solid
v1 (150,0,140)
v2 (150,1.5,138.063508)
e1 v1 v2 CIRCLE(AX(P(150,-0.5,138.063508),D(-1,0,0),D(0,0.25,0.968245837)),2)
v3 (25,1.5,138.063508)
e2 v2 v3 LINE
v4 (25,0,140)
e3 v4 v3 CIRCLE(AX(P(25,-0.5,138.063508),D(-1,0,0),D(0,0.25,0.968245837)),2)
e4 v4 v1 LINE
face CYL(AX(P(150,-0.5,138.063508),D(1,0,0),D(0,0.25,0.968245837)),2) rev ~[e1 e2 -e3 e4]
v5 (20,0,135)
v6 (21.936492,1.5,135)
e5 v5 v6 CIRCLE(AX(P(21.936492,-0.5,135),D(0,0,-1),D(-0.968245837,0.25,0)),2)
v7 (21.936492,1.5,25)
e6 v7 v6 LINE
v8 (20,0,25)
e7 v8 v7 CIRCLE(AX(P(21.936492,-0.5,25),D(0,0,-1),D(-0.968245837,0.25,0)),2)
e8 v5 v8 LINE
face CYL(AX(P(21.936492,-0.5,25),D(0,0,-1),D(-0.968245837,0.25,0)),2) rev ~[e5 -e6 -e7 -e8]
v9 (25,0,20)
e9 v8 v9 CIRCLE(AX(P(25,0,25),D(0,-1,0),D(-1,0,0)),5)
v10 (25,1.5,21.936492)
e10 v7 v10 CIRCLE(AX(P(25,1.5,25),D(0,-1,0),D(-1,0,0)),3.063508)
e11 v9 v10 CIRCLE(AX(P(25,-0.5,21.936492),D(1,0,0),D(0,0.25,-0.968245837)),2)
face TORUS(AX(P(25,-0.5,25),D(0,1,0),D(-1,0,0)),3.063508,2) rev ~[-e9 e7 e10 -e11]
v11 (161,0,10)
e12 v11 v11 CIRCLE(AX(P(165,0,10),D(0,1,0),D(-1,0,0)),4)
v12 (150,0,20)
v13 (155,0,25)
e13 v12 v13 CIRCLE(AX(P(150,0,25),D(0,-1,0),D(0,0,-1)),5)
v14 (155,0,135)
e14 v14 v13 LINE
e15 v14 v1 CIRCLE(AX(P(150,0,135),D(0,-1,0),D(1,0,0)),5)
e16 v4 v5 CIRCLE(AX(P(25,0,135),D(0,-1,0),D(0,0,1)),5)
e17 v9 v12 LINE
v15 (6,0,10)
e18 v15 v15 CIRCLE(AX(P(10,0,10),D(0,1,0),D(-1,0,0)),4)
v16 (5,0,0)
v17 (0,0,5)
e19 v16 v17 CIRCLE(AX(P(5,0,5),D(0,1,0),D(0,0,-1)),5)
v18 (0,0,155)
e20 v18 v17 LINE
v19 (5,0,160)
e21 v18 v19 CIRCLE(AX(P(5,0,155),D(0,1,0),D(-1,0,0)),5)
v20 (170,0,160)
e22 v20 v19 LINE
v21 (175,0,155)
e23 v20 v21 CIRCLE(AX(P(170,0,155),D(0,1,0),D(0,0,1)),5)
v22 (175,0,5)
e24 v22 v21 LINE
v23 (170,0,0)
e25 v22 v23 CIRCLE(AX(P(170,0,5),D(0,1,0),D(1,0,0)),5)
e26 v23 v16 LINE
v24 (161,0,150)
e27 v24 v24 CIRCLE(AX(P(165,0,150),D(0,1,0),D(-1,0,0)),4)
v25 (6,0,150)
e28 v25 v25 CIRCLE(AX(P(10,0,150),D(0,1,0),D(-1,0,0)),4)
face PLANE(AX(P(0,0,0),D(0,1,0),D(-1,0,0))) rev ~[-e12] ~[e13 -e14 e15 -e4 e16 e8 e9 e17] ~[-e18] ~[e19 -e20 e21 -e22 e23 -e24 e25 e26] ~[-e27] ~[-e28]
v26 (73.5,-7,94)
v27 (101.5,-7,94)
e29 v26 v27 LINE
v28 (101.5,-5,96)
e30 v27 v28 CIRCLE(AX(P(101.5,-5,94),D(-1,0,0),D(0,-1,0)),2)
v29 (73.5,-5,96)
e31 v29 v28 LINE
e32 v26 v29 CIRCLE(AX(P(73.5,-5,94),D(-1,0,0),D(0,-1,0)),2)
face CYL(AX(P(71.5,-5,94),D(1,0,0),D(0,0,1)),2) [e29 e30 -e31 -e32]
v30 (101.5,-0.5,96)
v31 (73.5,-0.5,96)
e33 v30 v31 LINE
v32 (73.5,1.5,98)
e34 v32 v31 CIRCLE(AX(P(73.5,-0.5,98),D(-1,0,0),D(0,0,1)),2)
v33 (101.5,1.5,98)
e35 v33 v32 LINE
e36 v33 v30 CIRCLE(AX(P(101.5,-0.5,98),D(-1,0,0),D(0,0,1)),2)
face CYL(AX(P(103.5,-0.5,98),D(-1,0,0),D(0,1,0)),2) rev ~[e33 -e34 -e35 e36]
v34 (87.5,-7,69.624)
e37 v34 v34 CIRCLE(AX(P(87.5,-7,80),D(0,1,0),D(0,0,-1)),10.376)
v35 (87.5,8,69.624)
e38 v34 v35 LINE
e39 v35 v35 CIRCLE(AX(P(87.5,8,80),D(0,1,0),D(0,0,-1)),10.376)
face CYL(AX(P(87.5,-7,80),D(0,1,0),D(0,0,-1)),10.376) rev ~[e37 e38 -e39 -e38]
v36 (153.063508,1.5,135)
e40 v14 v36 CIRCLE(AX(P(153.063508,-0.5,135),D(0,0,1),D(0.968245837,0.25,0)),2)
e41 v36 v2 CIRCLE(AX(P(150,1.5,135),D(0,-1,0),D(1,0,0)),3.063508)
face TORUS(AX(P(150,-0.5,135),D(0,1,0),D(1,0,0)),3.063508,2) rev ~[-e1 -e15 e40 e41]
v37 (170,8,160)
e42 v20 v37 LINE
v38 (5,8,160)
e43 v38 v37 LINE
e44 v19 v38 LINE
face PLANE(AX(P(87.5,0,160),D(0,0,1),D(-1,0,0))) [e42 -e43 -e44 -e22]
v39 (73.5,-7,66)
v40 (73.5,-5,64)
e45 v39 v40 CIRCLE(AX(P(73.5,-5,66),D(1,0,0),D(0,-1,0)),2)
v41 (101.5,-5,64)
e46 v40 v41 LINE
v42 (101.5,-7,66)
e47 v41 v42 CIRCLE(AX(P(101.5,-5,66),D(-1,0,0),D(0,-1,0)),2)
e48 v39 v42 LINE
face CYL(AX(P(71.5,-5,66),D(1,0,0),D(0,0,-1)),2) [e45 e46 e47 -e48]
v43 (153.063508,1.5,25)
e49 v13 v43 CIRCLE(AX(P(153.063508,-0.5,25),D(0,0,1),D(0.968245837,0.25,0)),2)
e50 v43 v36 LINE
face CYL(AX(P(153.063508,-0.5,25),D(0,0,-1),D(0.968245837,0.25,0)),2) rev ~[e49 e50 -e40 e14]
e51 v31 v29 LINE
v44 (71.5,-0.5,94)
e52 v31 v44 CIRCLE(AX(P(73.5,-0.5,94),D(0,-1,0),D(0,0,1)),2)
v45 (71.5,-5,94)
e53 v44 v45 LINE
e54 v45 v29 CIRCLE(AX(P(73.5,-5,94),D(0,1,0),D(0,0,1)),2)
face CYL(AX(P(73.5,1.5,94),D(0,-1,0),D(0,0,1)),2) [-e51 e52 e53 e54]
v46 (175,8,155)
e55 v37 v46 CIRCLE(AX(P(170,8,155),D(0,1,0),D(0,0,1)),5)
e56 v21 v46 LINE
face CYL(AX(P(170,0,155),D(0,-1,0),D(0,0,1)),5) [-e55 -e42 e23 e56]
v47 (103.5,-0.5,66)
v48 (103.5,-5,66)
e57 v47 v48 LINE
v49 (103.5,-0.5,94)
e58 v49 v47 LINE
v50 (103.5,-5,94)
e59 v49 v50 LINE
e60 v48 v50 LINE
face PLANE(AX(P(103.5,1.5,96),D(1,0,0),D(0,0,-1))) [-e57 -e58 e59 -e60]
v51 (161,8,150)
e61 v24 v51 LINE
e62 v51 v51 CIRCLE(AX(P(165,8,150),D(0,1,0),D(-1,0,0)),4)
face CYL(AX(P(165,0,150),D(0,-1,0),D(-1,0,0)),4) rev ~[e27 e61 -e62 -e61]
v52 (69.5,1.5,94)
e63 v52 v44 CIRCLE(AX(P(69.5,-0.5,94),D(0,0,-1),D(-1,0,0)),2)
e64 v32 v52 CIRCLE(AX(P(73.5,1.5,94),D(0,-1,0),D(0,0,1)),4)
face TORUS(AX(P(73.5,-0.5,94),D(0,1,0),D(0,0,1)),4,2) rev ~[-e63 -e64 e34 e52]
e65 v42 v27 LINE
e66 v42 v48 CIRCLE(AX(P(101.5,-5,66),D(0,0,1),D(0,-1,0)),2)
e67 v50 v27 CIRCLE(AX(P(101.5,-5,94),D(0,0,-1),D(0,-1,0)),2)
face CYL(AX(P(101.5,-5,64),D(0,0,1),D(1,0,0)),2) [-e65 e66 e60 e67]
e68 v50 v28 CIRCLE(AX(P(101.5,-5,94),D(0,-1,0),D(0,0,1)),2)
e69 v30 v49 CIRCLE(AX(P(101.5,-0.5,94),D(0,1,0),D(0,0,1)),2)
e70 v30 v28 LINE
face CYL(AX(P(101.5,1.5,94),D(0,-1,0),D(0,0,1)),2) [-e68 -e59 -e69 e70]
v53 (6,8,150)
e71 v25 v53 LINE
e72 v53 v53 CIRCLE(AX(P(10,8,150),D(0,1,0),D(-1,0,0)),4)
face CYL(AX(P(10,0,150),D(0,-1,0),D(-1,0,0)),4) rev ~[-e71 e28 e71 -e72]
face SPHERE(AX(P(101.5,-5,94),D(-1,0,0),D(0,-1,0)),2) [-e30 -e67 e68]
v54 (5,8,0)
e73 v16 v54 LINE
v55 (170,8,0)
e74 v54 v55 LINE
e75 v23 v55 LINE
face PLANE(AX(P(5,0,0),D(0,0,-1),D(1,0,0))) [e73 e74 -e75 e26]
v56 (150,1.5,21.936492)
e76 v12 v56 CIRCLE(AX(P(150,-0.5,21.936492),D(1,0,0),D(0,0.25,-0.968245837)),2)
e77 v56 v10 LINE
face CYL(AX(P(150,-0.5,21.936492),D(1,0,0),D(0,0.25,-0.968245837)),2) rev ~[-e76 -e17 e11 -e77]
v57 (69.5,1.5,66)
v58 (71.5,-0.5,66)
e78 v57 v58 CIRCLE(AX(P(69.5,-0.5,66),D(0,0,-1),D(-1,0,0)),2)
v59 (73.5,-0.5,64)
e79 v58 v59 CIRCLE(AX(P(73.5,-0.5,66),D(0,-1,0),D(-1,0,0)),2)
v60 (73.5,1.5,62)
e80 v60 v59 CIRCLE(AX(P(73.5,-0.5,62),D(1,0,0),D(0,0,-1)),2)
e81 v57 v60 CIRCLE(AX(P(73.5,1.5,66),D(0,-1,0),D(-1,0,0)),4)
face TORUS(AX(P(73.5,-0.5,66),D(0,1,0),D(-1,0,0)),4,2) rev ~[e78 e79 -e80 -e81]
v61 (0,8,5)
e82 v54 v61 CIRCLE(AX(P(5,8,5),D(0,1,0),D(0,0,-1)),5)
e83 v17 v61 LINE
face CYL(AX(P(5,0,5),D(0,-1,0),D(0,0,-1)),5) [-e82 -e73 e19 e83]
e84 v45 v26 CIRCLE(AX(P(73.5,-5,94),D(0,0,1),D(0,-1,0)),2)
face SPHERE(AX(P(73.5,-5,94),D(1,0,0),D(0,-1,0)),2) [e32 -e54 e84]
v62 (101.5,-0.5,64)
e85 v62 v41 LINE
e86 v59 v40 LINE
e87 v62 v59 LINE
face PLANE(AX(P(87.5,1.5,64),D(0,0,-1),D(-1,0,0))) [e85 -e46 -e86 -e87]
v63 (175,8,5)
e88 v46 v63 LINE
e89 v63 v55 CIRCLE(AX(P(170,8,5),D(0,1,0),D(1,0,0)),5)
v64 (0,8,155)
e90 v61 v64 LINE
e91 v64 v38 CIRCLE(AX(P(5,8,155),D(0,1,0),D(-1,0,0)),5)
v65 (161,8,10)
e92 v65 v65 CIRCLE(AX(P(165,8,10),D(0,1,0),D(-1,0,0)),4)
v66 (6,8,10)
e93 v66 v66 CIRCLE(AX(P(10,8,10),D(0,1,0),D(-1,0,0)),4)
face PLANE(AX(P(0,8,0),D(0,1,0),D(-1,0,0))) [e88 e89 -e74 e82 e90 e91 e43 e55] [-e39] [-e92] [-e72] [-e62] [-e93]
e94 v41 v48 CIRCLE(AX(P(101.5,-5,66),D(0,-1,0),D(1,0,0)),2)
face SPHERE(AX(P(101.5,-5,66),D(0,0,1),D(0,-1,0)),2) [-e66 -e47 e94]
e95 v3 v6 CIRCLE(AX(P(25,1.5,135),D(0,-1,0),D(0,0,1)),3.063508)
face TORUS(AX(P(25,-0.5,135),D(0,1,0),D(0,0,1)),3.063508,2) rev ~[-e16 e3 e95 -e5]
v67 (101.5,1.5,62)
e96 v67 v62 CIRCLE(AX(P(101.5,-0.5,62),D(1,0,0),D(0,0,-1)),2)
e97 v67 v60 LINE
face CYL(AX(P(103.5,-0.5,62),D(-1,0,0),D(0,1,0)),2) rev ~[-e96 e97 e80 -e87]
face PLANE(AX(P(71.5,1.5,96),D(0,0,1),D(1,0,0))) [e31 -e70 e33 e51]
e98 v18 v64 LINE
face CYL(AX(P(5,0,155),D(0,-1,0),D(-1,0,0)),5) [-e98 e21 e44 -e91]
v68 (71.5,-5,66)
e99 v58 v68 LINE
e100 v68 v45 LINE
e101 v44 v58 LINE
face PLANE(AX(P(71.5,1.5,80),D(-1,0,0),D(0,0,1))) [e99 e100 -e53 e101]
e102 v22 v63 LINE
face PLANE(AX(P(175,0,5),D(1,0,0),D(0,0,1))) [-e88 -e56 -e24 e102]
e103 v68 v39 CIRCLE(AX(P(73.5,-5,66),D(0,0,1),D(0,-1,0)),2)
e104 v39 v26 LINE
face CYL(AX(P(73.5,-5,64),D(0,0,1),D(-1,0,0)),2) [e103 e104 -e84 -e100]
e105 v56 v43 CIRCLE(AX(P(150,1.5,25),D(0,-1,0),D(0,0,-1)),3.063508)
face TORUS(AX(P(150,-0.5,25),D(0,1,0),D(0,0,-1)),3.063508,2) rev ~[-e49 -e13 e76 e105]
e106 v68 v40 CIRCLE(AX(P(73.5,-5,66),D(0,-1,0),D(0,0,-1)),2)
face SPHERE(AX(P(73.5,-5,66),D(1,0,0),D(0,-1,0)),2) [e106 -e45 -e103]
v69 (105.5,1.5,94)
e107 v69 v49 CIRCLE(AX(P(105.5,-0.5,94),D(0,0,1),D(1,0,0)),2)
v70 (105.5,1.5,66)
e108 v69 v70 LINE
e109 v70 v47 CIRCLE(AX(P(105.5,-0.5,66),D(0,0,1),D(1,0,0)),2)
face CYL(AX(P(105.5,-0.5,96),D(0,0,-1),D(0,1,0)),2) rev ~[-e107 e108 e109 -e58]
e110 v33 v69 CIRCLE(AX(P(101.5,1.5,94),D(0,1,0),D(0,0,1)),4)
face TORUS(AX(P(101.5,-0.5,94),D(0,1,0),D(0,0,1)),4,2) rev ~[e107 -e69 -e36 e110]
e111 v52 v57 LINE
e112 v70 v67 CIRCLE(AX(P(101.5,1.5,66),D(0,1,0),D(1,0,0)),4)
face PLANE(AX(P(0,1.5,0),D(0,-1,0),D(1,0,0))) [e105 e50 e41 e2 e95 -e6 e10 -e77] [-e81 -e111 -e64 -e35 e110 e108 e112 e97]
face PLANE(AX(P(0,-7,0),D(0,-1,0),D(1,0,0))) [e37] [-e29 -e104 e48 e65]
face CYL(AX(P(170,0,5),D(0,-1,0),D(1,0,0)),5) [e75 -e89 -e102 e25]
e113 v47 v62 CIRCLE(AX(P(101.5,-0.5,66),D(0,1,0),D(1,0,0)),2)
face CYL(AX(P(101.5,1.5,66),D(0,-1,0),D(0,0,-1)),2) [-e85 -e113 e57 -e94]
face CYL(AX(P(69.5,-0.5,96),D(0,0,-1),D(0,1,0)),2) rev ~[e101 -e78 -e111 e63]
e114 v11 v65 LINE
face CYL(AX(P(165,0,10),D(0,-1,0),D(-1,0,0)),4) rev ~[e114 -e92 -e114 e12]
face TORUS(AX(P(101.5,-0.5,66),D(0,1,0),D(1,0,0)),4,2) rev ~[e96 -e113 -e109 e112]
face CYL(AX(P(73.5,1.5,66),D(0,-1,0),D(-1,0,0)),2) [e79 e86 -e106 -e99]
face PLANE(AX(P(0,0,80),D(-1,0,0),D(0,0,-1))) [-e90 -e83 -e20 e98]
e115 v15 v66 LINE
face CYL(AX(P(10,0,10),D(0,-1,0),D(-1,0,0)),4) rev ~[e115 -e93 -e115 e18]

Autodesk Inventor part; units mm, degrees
ref_plane "YZ Plane" through (0, 0, 0) normal (1, 0, 0) x (0, 1, 0)
ref_plane "XZ Plane" through (0, 0, 0) normal (0, 1, 0) x (-1, 0, 0)
ref_plane "XY Plane" through (0, 0, 0) normal (0, 0, 1) x (1, 0, 0)
sketch "草图1" plane through (0, 0, 0) normal (0, 1, 0) x (-1, 0, 0)
  line L0 (-5, 0) -> (-170, 0)
  line L1 (-175, 5) -> (-175, 155)
  line L2 (-170, 160) -> (-5, 160)
  line L3 (0, 155) -> (0, 5)
  line L4 (22.306, 80) -> (-199.7113, 80)
  line L5 (-87.5, 206.246) -> (-87.5, -79.95)
  circle A0 centre (-10, 150) radius 4
  circle A1 centre (-10, 10) radius 4
  circle A2 centre (-165, 150) radius 4
  circle A3 centre (-165, 10) radius 4
  arc A4 (0, 155) -> (-5, 160) centre (-5, 155) ccw
  arc A5 (-5, 0) -> (0, 5) centre (-5, 5) ccw
  arc A6 (-175, 5) -> (-170, 0) centre (-170, 5) ccw
  arc A7 (-170, 160) -> (-175, 155) centre (-170, 155) ccw
  point P0 (0, 0)
  point P1 (-175, 0)
  point P2 (0, 160)
  point P3 (-87.5, 160)
  point P4 (0, 80)
  point P5 (-87.5, 80)
  point P6 (-87.5, 0)
  point P7 (-87.5, 80)
  dimension "d0" = 160
  dimension "d1" = 175
  dimension "d2" = 8
  dimension "d6" = 140
  dimension "d9" = 155
  dimension "d12" = 5
extrude "拉伸1" add sketch "草图1" along normal blind 8
sketch "草图2" plane through (0, 0, 0) normal (0, -1, 0) x (1, 0, 0)
  line L0 (150, 140) -> (25, 140)
  line L1 (20, 135) -> (20, 25)
  line L2 (25, 20) -> (150, 20)
  line L3 (155, 25) -> (155, 135)
  arc A0 (155, 135) -> (150, 140) centre (150, 135) ccw
  arc A1 (150, 20) -> (155, 25) centre (150, 25) ccw
  arc A2 (20, 25) -> (25, 20) centre (25, 25) ccw
  arc A3 (25, 140) -> (20, 135) centre (25, 135) ccw
  line L4 (87.5, 206.246) -> (87.5, -79.95) projected
  line L5 (-22.306, 80) -> (199.7113, 80) projected
  point P0 (0, 0)
  point P1 (87.5, 140)
  point P2 (155, 80)
  dimension "d15" = 5
  dimension "d16" = 120
  dimension "d17" = 135
extrude "拉伸2" cut sketch "草图2" against normal blind 1.5
fillet "圆角1" radius 2 8 edges at (153.5355, 1.5, 138.5355) (155, 1.5, 80) (153.5355, 1.5, 21.4645) (87.5, 1.5, 20) (21.4645, 1.5, 21.4645) (20, 1.5, 80) (21.4645, 1.5, 138.5355) (87.5, 1.5, 140)
sketch "草图3" plane through (0, 1.5, 0) normal (0, -1, 0) x (1, 0, 0)
  line L0 (71.5, 96) -> (103.5, 96)
  line L1 (103.5, 96) -> (103.5, 64)
  line L2 (103.5, 64) -> (71.5, 64)
  line L3 (71.5, 64) -> (71.5, 96)
  line L4 (-22.306, 80) -> (199.7113, 80) projected
  line L5 (87.5, 206.246) -> (87.5, -79.95) projected
  point P0 (0, 0)
  point P1 (71.5, 80)
  point P2 (87.5, 96)
  dimension "d28" = 32
extrude "拉伸3" add sketch "草图3" along normal blind 8.5
fillet "圆角2" radius 2 12 edges at (87.5, -7, 96) (103.5, -7, 80) (87.5, -7, 64) (71.5, -7, 80) (87.5, 1.5, 96) (71.5, 1.5, 80) (103.5, 1.5, 80) (87.5, 1.5, 64) (71.5, -2.75, 96) (71.5, -2.75, 64) (103.5, -2.75, 64) (103.5, -2.75, 96)
sketch "草图4" plane through (0, -7, 0) normal (0, -1, 0) x (1, 0, 0)
  line L0 (-22.306, 80) -> (199.7113, 80) projected
  line L1 (87.5, 206.246) -> (87.5, -79.95) projected
  point P0 (0, 0)
  point P1 (87.5, 80)
hole "孔2" at (87.5, -7, 80) direction (0, 1, 0) diameter 20.752 end through all thread size "M24x3" designation "M24" class "6H" standard "GB Metric profile"
equation "\"d0\" = A1"
equation "\"d1\" = B1"
equation "\"d2\" = d4"
equation "\"d6\" = A2"
equation "\"d9\" = B2"
equation "\"d12\" = R"
equation "\"d13\" = h_"
equation "\"d15\" = R"
equation "\"d16\" = A_"
equation "\"d17\" = B"
equation "\"d4\" = 8"
equation "\"A2\" = 140"
equation "\"B2\" = 155"
equation "\"R\" = 5"
equation "\"h_\" = 8"
equation "\"A_\" = 120"
equation "\"B\" = 135"
equation "\"A1\" = 160"
equation "\"B1\" = 175"
properties part number "盖板" material "聚碳酸酯，透明"
